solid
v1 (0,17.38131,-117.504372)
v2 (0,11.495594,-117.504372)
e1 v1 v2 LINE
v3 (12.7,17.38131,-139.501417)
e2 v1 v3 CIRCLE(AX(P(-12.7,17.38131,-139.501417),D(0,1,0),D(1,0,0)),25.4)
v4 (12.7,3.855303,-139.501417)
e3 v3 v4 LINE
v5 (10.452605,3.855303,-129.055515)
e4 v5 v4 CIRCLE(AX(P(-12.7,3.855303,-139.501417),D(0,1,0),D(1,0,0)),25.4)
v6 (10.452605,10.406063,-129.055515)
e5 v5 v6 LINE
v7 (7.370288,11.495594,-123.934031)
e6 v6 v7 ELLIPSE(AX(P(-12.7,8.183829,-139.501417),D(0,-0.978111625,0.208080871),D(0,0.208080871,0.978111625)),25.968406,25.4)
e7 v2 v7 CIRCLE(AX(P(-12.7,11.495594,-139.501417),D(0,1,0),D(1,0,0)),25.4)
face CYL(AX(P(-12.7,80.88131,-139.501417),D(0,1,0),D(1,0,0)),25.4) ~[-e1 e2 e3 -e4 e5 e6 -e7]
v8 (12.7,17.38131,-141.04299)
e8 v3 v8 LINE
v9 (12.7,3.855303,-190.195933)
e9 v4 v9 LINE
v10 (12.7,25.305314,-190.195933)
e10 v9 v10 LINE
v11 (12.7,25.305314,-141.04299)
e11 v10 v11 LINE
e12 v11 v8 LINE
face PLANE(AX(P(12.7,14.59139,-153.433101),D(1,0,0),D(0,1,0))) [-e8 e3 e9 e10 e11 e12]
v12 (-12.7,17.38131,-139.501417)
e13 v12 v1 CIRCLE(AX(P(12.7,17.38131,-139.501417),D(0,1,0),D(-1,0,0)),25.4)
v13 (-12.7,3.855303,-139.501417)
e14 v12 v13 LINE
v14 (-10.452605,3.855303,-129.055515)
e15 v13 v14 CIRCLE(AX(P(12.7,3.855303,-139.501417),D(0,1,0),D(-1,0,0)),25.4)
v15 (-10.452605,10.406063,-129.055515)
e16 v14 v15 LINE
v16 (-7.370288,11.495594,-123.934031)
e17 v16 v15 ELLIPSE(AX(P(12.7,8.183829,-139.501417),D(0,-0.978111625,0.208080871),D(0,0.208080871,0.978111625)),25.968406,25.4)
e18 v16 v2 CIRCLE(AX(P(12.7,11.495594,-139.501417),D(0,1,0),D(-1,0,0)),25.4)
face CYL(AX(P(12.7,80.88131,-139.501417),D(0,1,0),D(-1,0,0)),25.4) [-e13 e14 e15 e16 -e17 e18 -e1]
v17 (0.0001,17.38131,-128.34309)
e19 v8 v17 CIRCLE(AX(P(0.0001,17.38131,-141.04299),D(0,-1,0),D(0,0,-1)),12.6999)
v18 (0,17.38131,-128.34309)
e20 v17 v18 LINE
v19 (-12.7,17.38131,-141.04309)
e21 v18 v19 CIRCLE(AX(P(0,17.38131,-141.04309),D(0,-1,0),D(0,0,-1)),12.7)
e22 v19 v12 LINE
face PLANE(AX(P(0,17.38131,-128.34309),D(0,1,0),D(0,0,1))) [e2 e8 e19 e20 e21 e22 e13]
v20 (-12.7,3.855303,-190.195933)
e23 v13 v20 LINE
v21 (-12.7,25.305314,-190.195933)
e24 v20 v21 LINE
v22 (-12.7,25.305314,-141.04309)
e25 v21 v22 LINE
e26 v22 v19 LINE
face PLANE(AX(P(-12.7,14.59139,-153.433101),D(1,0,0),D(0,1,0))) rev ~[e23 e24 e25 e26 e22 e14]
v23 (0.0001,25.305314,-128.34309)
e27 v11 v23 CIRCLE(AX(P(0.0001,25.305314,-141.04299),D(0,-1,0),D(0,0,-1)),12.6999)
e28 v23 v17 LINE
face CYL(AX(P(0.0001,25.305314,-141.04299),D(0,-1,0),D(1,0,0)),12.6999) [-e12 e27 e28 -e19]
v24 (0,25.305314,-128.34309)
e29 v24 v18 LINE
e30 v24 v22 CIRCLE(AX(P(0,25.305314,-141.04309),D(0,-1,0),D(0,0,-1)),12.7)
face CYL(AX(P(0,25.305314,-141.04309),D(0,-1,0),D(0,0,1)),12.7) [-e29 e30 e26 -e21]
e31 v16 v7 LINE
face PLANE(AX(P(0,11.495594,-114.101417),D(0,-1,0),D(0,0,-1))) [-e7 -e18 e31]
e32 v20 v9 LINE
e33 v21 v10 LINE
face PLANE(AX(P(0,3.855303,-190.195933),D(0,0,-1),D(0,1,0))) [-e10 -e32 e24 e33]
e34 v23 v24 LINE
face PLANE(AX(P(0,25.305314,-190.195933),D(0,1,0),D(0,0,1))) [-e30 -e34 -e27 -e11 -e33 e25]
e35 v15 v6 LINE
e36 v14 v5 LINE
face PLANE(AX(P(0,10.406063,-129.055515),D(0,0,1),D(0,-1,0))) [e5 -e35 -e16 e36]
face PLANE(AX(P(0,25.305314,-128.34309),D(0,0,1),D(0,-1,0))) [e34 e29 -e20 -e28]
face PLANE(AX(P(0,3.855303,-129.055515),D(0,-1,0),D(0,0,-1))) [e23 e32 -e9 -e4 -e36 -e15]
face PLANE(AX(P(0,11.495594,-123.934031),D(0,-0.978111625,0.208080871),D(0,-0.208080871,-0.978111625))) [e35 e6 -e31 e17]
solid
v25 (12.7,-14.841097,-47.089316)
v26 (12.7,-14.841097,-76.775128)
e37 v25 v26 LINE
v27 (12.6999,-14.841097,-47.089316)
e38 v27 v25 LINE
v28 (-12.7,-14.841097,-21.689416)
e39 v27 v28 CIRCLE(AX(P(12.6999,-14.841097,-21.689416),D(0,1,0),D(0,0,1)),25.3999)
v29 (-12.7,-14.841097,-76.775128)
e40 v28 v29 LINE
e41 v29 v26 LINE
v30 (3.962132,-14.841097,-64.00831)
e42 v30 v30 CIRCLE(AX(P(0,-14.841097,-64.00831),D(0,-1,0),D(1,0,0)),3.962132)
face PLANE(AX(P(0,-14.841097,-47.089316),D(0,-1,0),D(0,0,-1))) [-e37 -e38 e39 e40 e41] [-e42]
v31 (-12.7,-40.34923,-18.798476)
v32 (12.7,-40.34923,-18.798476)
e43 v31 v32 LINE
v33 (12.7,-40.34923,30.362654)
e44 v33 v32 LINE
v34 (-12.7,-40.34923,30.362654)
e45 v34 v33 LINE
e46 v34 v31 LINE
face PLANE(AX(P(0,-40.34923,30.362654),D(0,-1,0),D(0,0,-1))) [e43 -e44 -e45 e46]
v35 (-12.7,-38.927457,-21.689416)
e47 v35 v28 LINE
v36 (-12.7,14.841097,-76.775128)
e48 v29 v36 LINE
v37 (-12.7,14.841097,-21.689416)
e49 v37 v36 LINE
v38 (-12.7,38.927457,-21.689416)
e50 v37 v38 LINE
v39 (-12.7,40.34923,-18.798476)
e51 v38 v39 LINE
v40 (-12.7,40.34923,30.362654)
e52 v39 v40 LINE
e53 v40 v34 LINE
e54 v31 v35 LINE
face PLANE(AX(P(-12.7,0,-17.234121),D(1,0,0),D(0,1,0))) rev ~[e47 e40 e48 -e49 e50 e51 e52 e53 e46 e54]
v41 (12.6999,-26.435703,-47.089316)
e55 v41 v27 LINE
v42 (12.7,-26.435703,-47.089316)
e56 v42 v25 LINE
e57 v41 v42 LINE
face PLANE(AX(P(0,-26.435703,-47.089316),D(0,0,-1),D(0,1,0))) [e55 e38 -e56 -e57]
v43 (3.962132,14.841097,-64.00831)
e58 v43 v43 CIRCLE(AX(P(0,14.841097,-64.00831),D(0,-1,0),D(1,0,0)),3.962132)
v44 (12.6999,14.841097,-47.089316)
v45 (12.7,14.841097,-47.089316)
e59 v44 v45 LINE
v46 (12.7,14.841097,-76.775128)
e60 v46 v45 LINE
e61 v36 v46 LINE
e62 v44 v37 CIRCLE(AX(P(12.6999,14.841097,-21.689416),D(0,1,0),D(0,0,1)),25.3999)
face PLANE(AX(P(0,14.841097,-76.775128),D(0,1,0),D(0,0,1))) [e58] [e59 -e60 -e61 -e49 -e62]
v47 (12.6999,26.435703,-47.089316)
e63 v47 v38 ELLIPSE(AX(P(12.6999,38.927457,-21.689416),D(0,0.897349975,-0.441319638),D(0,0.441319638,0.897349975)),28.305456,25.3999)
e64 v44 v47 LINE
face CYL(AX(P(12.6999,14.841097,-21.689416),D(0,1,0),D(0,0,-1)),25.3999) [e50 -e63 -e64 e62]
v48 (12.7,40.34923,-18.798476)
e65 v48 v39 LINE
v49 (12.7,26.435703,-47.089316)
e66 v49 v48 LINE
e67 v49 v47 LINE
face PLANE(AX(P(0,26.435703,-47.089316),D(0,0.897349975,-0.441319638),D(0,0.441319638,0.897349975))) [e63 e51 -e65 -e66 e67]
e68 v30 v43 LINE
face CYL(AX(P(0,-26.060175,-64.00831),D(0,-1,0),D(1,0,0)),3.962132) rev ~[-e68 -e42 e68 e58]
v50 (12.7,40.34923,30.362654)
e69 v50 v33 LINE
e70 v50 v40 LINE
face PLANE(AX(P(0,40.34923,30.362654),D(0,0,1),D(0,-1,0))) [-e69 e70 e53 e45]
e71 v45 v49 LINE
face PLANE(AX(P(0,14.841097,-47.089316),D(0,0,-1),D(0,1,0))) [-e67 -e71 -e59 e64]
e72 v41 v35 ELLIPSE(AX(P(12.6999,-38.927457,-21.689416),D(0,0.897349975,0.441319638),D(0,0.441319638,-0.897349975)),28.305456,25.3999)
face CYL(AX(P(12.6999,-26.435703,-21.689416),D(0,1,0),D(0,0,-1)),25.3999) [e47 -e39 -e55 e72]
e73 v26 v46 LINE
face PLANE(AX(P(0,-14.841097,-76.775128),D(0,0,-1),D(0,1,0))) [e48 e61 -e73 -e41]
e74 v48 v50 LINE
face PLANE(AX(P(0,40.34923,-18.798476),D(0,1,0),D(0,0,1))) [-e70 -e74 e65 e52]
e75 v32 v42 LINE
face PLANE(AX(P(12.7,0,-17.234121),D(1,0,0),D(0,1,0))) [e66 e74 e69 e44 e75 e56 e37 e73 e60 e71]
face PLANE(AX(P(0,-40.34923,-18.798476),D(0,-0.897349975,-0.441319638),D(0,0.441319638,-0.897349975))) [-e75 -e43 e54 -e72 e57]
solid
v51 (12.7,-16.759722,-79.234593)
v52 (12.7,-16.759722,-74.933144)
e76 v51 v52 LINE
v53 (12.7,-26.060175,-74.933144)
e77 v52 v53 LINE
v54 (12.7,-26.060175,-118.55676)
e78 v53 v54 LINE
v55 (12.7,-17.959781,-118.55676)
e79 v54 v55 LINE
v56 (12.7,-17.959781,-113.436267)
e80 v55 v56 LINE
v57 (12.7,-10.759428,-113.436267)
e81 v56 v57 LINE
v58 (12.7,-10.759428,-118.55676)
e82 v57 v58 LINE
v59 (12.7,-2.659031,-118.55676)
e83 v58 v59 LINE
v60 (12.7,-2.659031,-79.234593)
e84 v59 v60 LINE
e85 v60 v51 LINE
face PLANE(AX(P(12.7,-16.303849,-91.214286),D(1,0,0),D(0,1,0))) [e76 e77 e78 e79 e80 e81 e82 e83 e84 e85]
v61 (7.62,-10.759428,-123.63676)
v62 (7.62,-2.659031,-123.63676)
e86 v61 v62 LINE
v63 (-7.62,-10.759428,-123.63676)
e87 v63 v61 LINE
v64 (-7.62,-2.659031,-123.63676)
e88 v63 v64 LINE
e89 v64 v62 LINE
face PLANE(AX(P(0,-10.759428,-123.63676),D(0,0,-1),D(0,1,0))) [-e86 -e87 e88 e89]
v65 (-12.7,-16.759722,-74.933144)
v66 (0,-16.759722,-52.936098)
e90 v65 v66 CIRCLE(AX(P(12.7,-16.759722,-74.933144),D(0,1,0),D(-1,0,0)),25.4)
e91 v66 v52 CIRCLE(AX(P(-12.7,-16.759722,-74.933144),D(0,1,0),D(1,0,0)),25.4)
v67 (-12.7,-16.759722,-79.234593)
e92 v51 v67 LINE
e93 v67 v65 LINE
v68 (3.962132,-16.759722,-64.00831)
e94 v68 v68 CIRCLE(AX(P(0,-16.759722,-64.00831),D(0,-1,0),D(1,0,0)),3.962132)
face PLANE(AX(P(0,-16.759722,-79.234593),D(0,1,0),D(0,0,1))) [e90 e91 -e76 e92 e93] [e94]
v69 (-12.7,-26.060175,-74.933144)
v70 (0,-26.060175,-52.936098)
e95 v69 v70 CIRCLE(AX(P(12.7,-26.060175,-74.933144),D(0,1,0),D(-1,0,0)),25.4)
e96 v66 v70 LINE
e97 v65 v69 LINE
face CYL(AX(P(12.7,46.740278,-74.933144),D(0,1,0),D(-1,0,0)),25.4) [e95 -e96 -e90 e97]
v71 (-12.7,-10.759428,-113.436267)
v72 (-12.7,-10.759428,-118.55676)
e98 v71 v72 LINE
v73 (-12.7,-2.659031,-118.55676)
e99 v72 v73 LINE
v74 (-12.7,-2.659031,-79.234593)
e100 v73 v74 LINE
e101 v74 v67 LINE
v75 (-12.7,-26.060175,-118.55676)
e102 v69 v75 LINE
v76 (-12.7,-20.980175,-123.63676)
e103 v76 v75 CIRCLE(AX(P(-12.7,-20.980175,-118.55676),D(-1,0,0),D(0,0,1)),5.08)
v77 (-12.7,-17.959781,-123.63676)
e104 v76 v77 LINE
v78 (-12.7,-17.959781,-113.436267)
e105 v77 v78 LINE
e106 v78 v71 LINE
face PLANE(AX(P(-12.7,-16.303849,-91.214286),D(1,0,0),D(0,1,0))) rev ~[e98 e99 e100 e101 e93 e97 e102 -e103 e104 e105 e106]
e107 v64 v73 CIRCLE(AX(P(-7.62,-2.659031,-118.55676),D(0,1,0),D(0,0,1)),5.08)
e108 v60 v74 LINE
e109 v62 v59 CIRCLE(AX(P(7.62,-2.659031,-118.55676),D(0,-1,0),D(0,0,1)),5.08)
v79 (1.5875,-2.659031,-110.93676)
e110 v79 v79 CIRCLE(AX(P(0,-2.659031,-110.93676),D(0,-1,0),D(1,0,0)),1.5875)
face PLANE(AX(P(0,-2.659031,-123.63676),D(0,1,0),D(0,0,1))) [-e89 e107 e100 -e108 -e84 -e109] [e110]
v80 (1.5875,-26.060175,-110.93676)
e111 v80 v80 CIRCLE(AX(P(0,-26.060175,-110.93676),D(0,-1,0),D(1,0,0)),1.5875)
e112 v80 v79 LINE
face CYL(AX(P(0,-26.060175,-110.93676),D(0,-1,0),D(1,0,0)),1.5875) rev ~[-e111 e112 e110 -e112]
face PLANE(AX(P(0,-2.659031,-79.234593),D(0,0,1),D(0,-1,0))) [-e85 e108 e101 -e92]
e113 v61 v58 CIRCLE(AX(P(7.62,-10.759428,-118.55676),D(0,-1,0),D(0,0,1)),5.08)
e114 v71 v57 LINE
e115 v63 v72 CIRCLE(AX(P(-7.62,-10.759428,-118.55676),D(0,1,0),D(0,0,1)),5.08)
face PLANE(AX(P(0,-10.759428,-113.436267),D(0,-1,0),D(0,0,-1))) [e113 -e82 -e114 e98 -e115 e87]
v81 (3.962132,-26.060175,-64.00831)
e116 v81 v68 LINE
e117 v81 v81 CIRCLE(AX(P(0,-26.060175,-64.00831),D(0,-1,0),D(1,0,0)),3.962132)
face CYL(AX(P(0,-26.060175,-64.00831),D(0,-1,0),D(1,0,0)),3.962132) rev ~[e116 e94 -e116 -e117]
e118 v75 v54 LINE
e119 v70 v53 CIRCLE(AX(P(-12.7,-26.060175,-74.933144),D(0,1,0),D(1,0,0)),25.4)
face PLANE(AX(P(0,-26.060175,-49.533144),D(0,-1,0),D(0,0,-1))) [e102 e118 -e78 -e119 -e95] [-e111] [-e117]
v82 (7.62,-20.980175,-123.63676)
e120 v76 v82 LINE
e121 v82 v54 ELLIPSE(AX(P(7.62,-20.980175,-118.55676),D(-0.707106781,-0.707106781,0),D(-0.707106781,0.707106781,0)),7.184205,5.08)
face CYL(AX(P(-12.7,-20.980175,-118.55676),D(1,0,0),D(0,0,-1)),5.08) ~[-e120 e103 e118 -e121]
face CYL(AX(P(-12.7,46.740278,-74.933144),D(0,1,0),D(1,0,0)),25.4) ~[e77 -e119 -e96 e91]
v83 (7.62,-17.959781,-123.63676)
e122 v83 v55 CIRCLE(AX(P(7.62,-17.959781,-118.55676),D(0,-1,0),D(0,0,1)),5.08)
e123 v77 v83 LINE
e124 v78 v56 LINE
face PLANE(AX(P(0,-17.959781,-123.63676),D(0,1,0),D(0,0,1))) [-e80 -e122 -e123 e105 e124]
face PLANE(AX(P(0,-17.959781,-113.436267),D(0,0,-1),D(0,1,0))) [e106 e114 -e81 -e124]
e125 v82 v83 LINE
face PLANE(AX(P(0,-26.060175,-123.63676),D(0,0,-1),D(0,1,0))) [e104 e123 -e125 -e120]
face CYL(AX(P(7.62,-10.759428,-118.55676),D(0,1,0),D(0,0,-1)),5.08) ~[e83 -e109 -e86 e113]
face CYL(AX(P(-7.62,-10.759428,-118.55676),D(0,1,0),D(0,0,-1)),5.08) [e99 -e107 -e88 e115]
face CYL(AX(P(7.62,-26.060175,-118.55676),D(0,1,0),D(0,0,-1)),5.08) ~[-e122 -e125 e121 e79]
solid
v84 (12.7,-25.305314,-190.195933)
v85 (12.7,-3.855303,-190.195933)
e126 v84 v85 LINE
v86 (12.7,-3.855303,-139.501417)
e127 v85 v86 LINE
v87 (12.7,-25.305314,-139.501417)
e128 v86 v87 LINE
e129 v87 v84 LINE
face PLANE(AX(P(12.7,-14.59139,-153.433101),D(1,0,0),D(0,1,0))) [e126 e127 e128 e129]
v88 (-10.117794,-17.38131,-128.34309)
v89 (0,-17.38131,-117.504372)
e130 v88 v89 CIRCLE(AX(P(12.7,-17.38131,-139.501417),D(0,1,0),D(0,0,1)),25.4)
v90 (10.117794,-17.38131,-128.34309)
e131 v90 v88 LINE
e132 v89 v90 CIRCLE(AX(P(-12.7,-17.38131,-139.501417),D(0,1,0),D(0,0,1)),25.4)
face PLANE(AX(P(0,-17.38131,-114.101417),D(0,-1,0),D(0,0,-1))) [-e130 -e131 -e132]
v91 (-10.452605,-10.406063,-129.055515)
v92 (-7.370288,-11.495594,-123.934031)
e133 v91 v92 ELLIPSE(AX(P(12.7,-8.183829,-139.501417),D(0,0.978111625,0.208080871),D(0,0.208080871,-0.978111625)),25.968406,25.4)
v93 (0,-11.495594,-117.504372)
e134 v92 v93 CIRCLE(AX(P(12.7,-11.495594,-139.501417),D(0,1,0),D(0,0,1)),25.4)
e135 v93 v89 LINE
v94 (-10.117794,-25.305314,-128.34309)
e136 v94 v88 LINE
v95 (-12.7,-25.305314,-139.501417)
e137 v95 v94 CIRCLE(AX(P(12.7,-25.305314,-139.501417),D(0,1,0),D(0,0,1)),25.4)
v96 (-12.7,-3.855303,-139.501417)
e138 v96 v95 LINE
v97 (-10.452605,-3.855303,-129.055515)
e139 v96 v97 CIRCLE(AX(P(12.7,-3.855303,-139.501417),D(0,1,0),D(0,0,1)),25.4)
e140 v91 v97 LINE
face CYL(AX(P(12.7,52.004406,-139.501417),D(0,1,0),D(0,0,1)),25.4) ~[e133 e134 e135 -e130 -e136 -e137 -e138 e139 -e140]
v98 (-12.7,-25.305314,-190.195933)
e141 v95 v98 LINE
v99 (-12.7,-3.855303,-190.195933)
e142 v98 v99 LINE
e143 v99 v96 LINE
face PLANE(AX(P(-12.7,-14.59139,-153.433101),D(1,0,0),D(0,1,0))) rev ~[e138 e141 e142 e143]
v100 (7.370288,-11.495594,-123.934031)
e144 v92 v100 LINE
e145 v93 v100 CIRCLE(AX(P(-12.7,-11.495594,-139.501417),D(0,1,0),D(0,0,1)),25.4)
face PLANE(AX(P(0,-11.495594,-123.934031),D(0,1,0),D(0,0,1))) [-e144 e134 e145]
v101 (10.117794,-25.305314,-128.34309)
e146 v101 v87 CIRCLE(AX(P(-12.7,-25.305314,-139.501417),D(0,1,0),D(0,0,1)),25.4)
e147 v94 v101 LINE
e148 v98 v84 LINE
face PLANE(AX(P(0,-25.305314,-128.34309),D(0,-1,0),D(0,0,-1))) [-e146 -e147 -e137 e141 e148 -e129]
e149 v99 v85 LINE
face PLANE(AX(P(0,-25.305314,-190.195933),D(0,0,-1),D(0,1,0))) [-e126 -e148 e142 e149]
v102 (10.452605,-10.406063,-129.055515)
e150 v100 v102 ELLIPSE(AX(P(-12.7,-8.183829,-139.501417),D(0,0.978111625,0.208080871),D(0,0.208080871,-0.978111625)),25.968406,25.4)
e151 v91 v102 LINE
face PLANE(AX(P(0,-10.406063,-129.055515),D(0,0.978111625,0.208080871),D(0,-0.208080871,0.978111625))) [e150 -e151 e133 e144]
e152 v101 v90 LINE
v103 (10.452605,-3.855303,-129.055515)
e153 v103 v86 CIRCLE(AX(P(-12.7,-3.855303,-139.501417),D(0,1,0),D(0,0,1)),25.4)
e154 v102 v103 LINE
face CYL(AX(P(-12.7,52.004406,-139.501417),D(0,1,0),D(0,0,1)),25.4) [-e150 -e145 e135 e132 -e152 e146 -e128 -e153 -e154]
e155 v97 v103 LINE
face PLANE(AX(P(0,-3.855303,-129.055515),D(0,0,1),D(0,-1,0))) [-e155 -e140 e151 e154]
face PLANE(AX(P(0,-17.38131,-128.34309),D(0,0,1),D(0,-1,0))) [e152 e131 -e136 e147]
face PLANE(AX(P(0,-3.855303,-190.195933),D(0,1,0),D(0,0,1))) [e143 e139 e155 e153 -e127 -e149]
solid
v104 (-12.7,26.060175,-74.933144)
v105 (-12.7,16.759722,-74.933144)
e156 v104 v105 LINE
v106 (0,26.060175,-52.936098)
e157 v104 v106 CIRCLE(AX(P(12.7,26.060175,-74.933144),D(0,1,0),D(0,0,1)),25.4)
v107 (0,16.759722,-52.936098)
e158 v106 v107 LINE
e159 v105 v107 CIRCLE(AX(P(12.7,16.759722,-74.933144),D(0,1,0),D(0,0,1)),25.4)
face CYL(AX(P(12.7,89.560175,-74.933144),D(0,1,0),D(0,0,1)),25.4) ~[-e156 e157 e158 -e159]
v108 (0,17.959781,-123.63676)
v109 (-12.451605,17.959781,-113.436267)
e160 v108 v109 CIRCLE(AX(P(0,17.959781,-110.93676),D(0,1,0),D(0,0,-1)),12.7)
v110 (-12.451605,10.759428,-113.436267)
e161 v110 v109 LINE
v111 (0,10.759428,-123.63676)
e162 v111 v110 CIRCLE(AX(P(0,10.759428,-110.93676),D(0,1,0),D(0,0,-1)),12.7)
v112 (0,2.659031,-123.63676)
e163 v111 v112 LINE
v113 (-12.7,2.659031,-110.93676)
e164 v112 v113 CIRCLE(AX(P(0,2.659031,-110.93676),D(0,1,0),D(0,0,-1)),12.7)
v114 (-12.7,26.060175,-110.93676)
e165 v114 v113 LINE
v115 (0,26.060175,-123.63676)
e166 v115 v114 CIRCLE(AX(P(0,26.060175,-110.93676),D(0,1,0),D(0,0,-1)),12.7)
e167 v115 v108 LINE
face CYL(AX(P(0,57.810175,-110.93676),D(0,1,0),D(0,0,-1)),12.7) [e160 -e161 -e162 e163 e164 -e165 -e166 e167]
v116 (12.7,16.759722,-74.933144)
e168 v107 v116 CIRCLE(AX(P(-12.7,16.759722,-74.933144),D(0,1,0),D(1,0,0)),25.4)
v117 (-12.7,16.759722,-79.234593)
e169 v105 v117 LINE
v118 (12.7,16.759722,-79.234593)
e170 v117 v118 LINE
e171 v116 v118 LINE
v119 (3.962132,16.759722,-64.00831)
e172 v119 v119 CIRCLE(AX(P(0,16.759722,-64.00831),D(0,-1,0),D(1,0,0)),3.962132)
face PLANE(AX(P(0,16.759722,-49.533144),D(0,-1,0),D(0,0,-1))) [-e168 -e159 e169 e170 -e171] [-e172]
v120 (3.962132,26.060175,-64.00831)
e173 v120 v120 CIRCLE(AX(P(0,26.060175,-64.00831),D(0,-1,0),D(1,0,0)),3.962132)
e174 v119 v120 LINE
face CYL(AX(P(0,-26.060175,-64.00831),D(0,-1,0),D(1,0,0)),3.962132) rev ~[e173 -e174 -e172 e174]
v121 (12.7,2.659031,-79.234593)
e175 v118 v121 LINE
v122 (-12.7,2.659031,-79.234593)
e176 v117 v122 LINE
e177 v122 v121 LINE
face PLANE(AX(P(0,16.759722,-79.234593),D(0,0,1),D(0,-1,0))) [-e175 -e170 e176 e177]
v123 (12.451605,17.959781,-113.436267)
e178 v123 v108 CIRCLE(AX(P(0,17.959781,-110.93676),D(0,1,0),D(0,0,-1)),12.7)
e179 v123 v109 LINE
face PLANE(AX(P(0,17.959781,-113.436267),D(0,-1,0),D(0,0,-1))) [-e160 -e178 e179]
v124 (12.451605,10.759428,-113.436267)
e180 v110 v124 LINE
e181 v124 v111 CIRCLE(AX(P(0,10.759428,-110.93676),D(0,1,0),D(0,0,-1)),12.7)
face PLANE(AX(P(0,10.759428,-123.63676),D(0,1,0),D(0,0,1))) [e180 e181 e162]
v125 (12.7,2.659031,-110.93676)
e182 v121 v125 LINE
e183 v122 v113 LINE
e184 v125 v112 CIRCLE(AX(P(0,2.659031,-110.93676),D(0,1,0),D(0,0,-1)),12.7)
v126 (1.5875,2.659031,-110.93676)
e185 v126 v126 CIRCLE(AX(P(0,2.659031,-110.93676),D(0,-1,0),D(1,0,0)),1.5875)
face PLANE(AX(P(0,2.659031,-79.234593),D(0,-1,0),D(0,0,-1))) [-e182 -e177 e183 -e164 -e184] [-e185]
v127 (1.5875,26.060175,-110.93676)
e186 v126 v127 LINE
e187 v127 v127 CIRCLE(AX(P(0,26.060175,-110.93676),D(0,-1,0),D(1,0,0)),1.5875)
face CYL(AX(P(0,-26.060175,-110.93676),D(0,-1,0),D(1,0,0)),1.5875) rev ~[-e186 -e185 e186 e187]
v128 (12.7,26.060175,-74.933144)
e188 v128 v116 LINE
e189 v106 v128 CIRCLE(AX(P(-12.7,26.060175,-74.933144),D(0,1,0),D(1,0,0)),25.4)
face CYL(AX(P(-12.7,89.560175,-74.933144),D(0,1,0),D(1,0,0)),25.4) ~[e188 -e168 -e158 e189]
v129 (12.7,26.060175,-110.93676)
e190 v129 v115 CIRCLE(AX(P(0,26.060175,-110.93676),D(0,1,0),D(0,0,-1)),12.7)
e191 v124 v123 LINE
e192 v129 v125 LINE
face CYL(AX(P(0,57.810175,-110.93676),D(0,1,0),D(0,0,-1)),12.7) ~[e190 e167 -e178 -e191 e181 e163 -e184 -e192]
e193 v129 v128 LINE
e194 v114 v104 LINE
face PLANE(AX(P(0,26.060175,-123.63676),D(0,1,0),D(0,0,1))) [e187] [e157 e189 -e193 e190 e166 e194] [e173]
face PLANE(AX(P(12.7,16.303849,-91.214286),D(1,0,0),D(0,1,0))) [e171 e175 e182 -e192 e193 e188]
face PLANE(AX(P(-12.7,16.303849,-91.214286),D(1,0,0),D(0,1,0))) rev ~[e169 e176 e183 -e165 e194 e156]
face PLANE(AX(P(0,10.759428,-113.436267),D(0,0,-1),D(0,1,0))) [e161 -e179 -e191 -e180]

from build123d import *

# Parameters (mm, degrees)
F6_DEPTH       = 12.7
F7_DEPTH       = 12.7
F8_DEPTH       = 12.7
F9_F1_R        = 12.7
F9_F2_R        = 12.6999
F9_2_T1_DEPTH  = 71.6003941596
F9_2_T3_DEPTH  = 71.6003969535
F10_R          = 5.08
F11_T1_DEPTH   = 132.8857165277
F11_2_T1_DEPTH = 132.8857165277
F12_T1_DEPTH   = 136.3004535884
F12_2_T1_DEPTH = 136.3004535884
F12_3_F1_R     = 25.3999
F12_3_F2_R     = 25.3999
F13_R          = 3.1967586716
F14_DEPTH      = 40.3502301702
F15_R          = 3.9621319953
F16_DEPTH      = 66.4104053209
F19_R          = 1.5875
F20_DEPTH      = 66.4104053209


# Not quite as in the source:
# - a fillet or chamfer that OpenCascade refuses, or shapes differently, is made with other operations: its cross-section is extruded or revolved along the edge and cut away or added
# - a fillet or chamfer is up to 0.001 mm smaller than in the source, because OpenCascade refuses the exact size
# - a feature of the source that left no trace in its solid (it failed there, or was rolled back) is left out
# - the program builds the solid bodies; features that only make, move or delete a surface that nothing else refers to are left out


with BuildPart() as f6:
    # F5 (on Right) → F6 (new body, symmetric)
    with BuildSketch(Plane.YZ):
        Polygon((17.381310463, -124.0725144744), (17.381310463, -114.1014173627), (11.4955939353, -114.1014173627), (11.4955939353, -123.9340305328), (10.4060629383, -129.0555149317), (3.8553033955, -129.0555149317), (3.8553033955, -190.1959329844), (8.2224793732, -190.1959329844), (20.4505622387, -190.1959329844), (25.3053139895, -190.1959329844), (25.3053139895, -128.343090415), (17.381310463, -128.343090415), align=None)
    extrude(amount=F6_DEPTH, both=True)

    # F9: fillet of radius 12.7 on 2 edges, made by hand

    # F9_f1
    f9_f1_edges = [f6.edges().sort_by_distance(p)[0] for p in [
        (-12.7, 21.3433122262, -128.343090415),
    ]]
    fillet(f9_f1_edges, radius=F9_F1_R)

    # F9_f2 (radius 12.7 in the source; OpenCascade refuses exactly that, so slightly less here)
    f9_f2_edges = [f6.edges().sort_by_distance(p)[0] for p in [
        (12.7, 21.3433122262, -128.343090415),
    ]]
    fillet(f9_f2_edges, radius=F9_F2_R)

    # F11: fillet of radius 25.4 on 2 edges, made by hand

    # F11_s2 → F11_t1 (cut)
    with BuildSketch(Plane.XZ.offset(-80.881310463)):
        with BuildLine():
            ThreePointArc((12.7, -139.5014173627), (5.2605122421, -121.5409051206), (-12.7, -114.1014173627))
            Line((-12.7, -114.1014173627), (12.7, -114.1014173627))
            Line((12.7, -114.1014173627), (12.7, -139.5014173627))
        make_face()
        with BuildLine():
            ThreePointArc((-12.7, -139.5014173627), (-5.2605122421, -121.5409051206), (12.7, -114.1014173627))
            Line((12.7, -114.1014173627), (-12.7, -114.1014173627))
            Line((-12.7, -114.1014173627), (-12.7, -139.5014173627))
        make_face()
    extrude(amount=F11_T1_DEPTH, mode=Mode.SUBTRACT)


with BuildPart() as f6b:
    # F5 (on Right) → F6, piece 2 (new body, symmetric)
    with BuildSketch(Plane.YZ):
        Polygon((-17.381310463, -128.343090415), (-25.3053139895, -128.343090415), (-25.3053139895, -190.1959329844), (-20.4505622387, -190.1959329844), (-8.2224793732, -190.1959329844), (-3.8553033955, -190.1959329844), (-3.8553033955, -129.0555149317), (-10.4060629383, -129.0555149317), (-11.4955939353, -123.9340305328), (-11.4955939353, -114.1014173627), (-17.381310463, -114.1014173627), (-17.381310463, -124.0725144744), align=None)
    extrude(amount=F6_DEPTH, both=True)

    # F11#2: fillet of radius 25.4 on 2 edges, made by hand

    # F11_2_s2 → F11_2_t1 (cut)
    with BuildSketch(Plane.XZ.offset(-52.0044060647)):
        with BuildLine():
            ThreePointArc((-12.7, -114.1014173627), (5.2605122421, -121.5409051206), (12.7, -139.5014173627))
            Line((12.7, -139.5014173627), (12.7, -114.1014173627))
            Line((12.7, -114.1014173627), (-12.7, -114.1014173627))
        make_face()
        with BuildLine():
            ThreePointArc((12.7, -114.1014173627), (-5.2605122421, -121.5409051206), (-12.7, -139.5014173627))
            Line((-12.7, -139.5014173627), (-12.7, -114.1014173627))
            Line((-12.7, -114.1014173627), (12.7, -114.1014173627))
        make_face()
    extrude(amount=F11_2_T1_DEPTH, mode=Mode.SUBTRACT)


with BuildPart() as f7:
    # F4 (on Right) → F7 (new body, symmetric)
    with BuildSketch(Plane.YZ):
        Polygon((26.0601751506, -123.6367598176), (26.0601751506, -49.5331436396), (16.7597215623, -49.5331436396), (16.7597215623, -79.2345926166), (2.65903119, -79.2345926166), (2.65903119, -123.6367598176), (10.7594281435, -123.6367598176), (10.7594281435, -113.4362667799), (17.9597809911, -113.4362667799), (17.9597809911, -123.6367598176), align=None)
    extrude(amount=F7_DEPTH, both=True)

    # F9#2: fillet of radius 12.7 on 4 edges, made by hand

    # F9_2_s2 → F9_2_t1 (cut)
    with BuildSketch(Plane.XZ.offset(-57.8101751506)):
        with BuildLine():
            ThreePointArc((0, -123.6367598176), (8.9802561211, -119.9170159387), (12.7, -110.9367598176))
            Line((12.7, -110.9367598176), (12.7, -123.6367598176))
            Line((12.7, -123.6367598176), (0, -123.6367598176))
        make_face()
        with BuildLine():
            ThreePointArc((0, -123.6367598176), (-8.9802561211, -119.9170159387), (-12.7, -110.9367598176))
            Line((-12.7, -110.9367598176), (-12.7, -123.6367598176))
            Line((-12.7, -123.6367598176), (0, -123.6367598176))
        make_face()
    extrude(amount=F9_2_T1_DEPTH, mode=Mode.SUBTRACT)

    # F9_2_s4 → F9_2_t3 (cut)
    with BuildSketch(Plane.XZ.offset(-42.5094281435)):
        with BuildLine():
            ThreePointArc((0, -123.6367598176), (-8.9802561211, -119.9170159387), (-12.7, -110.9367598176))
            Line((-12.7, -110.9367598176), (-12.7, -123.6367598176))
            Line((-12.7, -123.6367598176), (0, -123.6367598176))
        make_face()
        with BuildLine():
            ThreePointArc((0, -123.6367598176), (8.9802561211, -119.9170159387), (12.7, -110.9367598176))
            Line((12.7, -110.9367598176), (12.7, -123.6367598176))
            Line((12.7, -123.6367598176), (0, -123.6367598176))
        make_face()
    extrude(amount=F9_2_T3_DEPTH, mode=Mode.SUBTRACT)

    # F12: fillet of radius 25.4 on 2 edges, made by hand

    # F12_s2 → F12_t1 (cut)
    with BuildSketch(Plane.XZ.offset(-89.5601751506)):
        with BuildLine():
            ThreePointArc((12.7, -49.5331436396), (-5.2605122421, -56.9726313974), (-12.7, -74.9331436396))
            Line((-12.7, -74.9331436396), (-12.7, -49.5331436396))
            Line((-12.7, -49.5331436396), (12.7, -49.5331436396))
        make_face()
        with BuildLine():
            ThreePointArc((12.7, -74.9331436396), (5.2605122421, -56.9726313974), (-12.7, -49.5331436396))
            Line((-12.7, -49.5331436396), (12.7, -49.5331436396))
            Line((12.7, -49.5331436396), (12.7, -74.9331436396))
        make_face()
    extrude(amount=F12_T1_DEPTH, mode=Mode.SUBTRACT)


with BuildPart() as f7b:
    # F4 (on Right) → F7, piece 2 (new body, symmetric)
    with BuildSketch(Plane.YZ):
        Polygon((-16.7597215623, -49.5331436396), (-26.0601751506, -49.5331436396), (-26.0601751506, -123.6367598176), (-17.9597809911, -123.6367598176), (-17.9597809911, -113.4362667799), (-10.7594281435, -113.4362667799), (-10.7594281435, -123.6367598176), (-2.65903119, -123.6367598176), (-2.65903119, -79.2345926166), (-16.7597215623, -79.2345926166), align=None)
    extrude(amount=F7_DEPTH, both=True)

    # F10
    f10_edges = [f7b.edges().sort_by_distance(p)[0] for p in [
        (12.7, -22.009978, -123.63676),
        (0, -26.060175, -123.63676),
        (-12.7, -6.70923, -123.63676),
        (12.7, -6.70923, -123.63676),
    ]]
    fillet(f10_edges, radius=F10_R)

    # F12#2: fillet of radius 25.4 on 2 edges, made by hand

    # F12_2_s2 → F12_2_t1 (cut)
    with BuildSketch(Plane.XZ.offset(-46.7402784377)):
        with BuildLine():
            ThreePointArc((-12.7, -74.9331436396), (-5.2605122421, -56.9726313974), (12.7, -49.5331436396))
            Line((12.7, -49.5331436396), (-12.7, -49.5331436396))
            Line((-12.7, -49.5331436396), (-12.7, -74.9331436396))
        make_face()
        with BuildLine():
            ThreePointArc((12.7, -74.9331436396), (5.2605122421, -56.9726313974), (-12.7, -49.5331436396))
            Line((-12.7, -49.5331436396), (12.7, -49.5331436396))
            Line((12.7, -49.5331436396), (12.7, -74.9331436396))
        make_face()
    extrude(amount=F12_2_T1_DEPTH, mode=Mode.SUBTRACT)


with BuildPart() as f8:
    # F3 (on Right) → F8 (new body, symmetric)
    with BuildSketch(Plane.YZ):
        Polygon((40.3492301702, 30.3626544774), (-40.3492301702, 30.3626544774), (-40.3492301702, 0), (-40.3492301702, -18.7984760851), (-26.4357030392, -47.0893159509), (-14.841097407, -47.0893159509), (-14.841097407, -76.7751282773), (14.841097407, -76.7751282773), (14.841097407, -47.0893159509), (26.4357030392, -47.0893159509), (40.3492301702, -18.7984760851), (40.3492301702, 0), align=None)
    extrude(amount=F8_DEPTH, both=True)

    # F12#3: fillet of radius 25.4 on 2 edges, made by hand

    # F12_3_f1 (radius 25.4 in the source; OpenCascade refuses exactly that, so slightly less here)
    f12_3_f1_edges = [f8.edges().sort_by_distance(p)[0] for p in [
        (-12.7, 20.6384002231, -47.0893159509),
    ]]
    fillet(f12_3_f1_edges, radius=F12_3_F1_R)

    # F12_3_f2 (radius 25.4 in the source; OpenCascade refuses exactly that, so slightly less here)
    f12_3_f2_edges = [f8.edges().sort_by_distance(p)[0] for p in [
        (-12.7, -20.6384002231, -47.0893159509),
    ]]
    fillet(f12_3_f2_edges, radius=F12_3_F2_R)


with BuildPart() as f14_tool:
    # F13 (on Front) → F14 (new body, through all)
    with BuildSketch(Plane.XZ):
        with Locations((0, -63.4542033076)):
            Circle(F13_R)
    extrude(amount=-F14_DEPTH)


with BuildPart() as f7_1:
    add(f7.part)

    # F14: cut by f14_tool
    add(f14_tool.part, mode=Mode.SUBTRACT)


with BuildPart() as f8_1:
    add(f8.part)

    # F14: cut by f14_tool
    add(f14_tool.part, mode=Mode.SUBTRACT)


with BuildPart() as f16_tool:
    # F15 (on face) → F16 (new body, through all)
    with BuildSketch(Plane.XZ.offset(26.0601751506)):
        with Locations((0, -64.0083104372)):
            Circle(F15_R)
    extrude(amount=-F16_DEPTH)


with BuildPart() as f7_2:
    add(f7_1.part)

    # F16: cut by f16_tool
    add(f16_tool.part, mode=Mode.SUBTRACT)


with BuildPart() as f7b_1:
    add(f7b.part)

    # F16: cut by f16_tool
    add(f16_tool.part, mode=Mode.SUBTRACT)


with BuildPart() as f8_2:
    add(f8_1.part)

    # F16: cut by f16_tool
    add(f16_tool.part, mode=Mode.SUBTRACT)


with BuildPart() as f20_tool:
    # F19 (on face) → F20 (new body, through all)
    with BuildSketch(Plane.XZ.offset(26.0601751506)):
        with Locations((0, -110.9367598176)):
            Circle(F19_R)
    extrude(amount=-F20_DEPTH)


with BuildPart() as f7_3:
    add(f7_2.part)

    # F20: cut by f20_tool
    add(f20_tool.part, mode=Mode.SUBTRACT)


with BuildPart() as f7b_2:
    add(f7b_1.part)

    # F20: cut by f20_tool
    add(f20_tool.part, mode=Mode.SUBTRACT)


solid = Compound([f6.part, f6b.part, f8_2.part, f7_3.part, f7b_2.part])
